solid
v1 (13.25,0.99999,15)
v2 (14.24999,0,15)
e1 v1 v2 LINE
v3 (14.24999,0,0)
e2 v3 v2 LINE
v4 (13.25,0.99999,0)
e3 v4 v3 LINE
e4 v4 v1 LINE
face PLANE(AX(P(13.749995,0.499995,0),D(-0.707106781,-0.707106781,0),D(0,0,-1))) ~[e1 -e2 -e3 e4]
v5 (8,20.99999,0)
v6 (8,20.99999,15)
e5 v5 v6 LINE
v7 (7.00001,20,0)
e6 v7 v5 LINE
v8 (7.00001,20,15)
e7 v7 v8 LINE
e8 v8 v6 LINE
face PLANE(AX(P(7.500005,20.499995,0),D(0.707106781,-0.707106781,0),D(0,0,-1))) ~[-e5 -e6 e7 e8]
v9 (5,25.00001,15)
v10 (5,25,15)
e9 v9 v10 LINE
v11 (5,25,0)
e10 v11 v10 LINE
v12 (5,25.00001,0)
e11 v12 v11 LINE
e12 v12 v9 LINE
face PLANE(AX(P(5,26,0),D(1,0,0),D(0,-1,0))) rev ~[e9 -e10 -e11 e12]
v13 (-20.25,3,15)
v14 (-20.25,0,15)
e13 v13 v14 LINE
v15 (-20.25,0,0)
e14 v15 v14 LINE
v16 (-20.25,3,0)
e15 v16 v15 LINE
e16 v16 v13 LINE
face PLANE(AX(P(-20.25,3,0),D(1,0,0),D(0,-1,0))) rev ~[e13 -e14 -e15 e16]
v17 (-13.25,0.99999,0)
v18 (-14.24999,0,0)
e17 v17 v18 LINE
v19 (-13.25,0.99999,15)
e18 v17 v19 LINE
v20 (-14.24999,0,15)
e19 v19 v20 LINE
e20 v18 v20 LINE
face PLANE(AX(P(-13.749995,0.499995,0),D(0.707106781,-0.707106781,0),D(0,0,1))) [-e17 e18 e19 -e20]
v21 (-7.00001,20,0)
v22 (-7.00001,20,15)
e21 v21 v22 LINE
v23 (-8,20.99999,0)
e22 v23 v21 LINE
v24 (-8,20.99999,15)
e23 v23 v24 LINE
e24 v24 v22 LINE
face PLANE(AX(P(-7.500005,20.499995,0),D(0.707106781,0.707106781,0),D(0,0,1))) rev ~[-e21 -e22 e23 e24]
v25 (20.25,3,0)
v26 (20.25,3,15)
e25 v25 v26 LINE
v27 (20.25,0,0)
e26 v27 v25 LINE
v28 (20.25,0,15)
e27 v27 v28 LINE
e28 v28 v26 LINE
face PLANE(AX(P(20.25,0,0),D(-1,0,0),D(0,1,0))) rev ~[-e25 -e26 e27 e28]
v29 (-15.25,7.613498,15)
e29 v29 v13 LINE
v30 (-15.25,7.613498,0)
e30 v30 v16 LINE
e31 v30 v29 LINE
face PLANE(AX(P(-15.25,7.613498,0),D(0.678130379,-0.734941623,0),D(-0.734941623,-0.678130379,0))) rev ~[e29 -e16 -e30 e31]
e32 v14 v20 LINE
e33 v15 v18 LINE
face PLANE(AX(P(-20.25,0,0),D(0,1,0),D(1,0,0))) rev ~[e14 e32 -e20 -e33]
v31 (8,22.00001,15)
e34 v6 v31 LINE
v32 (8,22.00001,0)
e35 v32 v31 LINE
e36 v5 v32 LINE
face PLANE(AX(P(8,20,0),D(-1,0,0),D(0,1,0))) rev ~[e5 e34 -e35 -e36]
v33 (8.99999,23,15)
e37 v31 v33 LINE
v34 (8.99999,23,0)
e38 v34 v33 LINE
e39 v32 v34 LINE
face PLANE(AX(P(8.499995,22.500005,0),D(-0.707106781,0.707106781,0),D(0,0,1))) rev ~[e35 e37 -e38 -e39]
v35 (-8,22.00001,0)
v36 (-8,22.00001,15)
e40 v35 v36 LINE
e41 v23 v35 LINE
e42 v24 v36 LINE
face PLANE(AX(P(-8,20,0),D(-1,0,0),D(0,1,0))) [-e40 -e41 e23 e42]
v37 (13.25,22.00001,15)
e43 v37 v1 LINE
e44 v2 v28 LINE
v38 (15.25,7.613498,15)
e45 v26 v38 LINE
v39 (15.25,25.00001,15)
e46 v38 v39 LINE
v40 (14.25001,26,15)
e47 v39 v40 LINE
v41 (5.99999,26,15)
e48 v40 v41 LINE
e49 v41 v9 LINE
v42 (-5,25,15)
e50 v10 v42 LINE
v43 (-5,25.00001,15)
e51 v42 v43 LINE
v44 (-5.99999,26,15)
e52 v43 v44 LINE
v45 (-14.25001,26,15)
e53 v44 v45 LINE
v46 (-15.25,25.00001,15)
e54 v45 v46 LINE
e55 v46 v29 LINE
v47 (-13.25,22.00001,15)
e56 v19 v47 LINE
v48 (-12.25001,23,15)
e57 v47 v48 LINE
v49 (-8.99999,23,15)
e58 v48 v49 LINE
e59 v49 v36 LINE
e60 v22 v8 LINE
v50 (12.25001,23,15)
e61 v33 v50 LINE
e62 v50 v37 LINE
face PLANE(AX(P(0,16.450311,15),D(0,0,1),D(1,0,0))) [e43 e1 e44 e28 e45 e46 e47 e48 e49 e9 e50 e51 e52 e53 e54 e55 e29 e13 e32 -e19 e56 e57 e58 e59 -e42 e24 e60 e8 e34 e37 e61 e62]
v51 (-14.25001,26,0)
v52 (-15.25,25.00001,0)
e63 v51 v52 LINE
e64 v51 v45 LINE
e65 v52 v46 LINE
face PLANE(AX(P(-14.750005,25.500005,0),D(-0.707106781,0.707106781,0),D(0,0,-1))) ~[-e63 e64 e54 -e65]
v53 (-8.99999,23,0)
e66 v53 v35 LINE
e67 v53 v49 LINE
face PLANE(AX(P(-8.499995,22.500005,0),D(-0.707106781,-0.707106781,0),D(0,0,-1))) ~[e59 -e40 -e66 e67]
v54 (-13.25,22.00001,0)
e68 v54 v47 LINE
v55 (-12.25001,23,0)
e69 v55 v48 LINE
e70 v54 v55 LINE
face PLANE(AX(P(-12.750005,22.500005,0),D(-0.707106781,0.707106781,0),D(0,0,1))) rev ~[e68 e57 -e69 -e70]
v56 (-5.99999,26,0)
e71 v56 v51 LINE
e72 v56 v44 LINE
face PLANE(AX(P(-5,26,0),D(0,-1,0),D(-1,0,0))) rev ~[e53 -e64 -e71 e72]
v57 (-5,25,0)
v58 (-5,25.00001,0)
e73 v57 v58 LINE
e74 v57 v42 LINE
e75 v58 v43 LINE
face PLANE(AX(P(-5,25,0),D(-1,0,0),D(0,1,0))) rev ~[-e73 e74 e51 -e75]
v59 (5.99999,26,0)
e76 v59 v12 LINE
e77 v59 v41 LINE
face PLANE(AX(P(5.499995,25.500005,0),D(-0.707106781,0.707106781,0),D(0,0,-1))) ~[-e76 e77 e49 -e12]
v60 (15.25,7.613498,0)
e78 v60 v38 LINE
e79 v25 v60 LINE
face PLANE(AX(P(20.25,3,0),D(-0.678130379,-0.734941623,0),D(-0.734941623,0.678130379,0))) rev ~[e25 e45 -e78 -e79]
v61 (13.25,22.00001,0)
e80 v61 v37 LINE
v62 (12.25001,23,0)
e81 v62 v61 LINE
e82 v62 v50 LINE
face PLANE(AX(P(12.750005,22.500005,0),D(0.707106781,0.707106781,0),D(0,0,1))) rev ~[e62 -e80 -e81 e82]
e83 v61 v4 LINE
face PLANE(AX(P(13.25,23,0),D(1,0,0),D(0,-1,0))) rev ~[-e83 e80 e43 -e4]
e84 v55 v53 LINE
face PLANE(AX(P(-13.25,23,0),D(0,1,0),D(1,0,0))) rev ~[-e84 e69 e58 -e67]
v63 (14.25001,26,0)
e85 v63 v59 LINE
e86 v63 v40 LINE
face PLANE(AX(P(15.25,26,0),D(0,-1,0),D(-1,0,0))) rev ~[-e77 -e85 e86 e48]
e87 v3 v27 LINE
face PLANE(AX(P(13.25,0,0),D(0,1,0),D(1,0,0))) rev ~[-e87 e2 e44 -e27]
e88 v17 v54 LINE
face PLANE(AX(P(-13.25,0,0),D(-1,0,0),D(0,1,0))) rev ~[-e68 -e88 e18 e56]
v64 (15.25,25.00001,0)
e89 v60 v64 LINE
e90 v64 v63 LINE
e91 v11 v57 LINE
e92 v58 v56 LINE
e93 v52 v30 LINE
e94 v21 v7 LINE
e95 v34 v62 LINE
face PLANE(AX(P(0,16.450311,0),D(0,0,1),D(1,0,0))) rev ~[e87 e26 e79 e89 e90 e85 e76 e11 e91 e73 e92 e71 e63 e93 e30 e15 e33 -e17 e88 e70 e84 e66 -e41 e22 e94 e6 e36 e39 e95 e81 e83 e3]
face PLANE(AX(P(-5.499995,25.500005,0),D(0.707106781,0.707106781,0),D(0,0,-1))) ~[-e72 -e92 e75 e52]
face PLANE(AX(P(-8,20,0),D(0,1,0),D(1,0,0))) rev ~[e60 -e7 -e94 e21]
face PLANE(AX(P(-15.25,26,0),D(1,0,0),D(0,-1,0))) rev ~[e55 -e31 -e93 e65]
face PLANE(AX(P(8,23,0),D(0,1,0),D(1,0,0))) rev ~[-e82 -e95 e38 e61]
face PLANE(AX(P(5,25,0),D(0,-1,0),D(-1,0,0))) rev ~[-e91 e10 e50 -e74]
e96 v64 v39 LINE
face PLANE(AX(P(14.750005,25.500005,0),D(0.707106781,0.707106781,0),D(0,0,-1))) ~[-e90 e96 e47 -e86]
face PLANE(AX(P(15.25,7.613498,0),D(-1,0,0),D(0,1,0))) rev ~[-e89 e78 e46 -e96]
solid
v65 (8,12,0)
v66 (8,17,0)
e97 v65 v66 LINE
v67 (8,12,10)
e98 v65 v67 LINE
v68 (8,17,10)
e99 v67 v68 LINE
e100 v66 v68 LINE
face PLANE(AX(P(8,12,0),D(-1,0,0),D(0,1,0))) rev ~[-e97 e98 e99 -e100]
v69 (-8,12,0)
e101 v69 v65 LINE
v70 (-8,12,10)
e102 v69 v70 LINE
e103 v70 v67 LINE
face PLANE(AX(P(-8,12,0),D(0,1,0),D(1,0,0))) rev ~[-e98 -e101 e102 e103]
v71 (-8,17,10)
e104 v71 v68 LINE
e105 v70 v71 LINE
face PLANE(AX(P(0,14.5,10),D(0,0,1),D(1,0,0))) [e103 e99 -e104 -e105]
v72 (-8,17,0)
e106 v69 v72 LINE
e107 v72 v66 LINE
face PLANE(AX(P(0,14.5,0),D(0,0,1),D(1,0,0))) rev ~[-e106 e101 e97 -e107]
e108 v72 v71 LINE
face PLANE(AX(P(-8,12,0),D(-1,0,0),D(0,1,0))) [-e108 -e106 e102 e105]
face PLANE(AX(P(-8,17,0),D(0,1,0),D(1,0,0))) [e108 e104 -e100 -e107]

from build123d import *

# Parameters (mm, degrees)
F0_W     = 16
F0_H     = 3
F1_DEPTH = 15
F2_SIZE  = 0.99999
F0_H_2   = 5
F3_DEPTH = 10


# Not quite as in the source:
# - a fillet or chamfer is up to 0.001 mm smaller than in the source, because OpenCascade refuses the exact size


with BuildPart() as f1:
    # F0 (on Top) → F1 (new body)
    with BuildSketch(Plane.XY):
        Polygon((-15.25, 7.6134982519), (-15.25, 0), (-13.25, 0), (-13.25, 23), (-8, 23), (8, 23), (13.25, 23), (13.25, 0), (15.25, 0), (15.25, 7.6134982519), (15.25, 26), (5, 26), (5, 25), (-5, 25), (-5, 26), (-15.25, 26), align=None)
        with Locations((0, 21.5)):
            Rectangle(F0_W, F0_H)
        Polygon((15.25, 7.6134982519), (15.25, 0), (20.25, 0), (20.25, 3), align=None)
        Polygon((-20.25, 0), (-15.25, 0), (-15.25, 7.6134982519), (-20.25, 3), align=None)
    extrude(amount=F1_DEPTH)

    # F2 (size 1 in the source; OpenCascade refuses exactly that, so slightly less here)
    f2_edges = [f1.edges().sort_by_distance(p)[0] for p in [
        (-13.25, 23, 7.5),
        (13.25, 23, 7.5),
        (15.25, 26, 7.5),
        (-15.25, 26, 7.5),
        (-5, 26, 7.5),
        (5, 26, 7.5),
        (-8, 23, 7.5),
        (-8, 20, 7.5),
        (8, 23, 7.5),
        (8, 20, 7.5),
        (13.25, 0, 7.5),
        (-13.25, 0, 7.5),
    ]]
    chamfer(f2_edges, length=F2_SIZE)


with BuildPart() as f3:
    # F0 (on Top) → F3 (new body)
    with BuildSketch(Plane.XY):
        with Locations((0, 14.5)):
            Rectangle(F0_W, F0_H_2)
    extrude(amount=F3_DEPTH)


solid = Compound([f1.part, f3.part])
